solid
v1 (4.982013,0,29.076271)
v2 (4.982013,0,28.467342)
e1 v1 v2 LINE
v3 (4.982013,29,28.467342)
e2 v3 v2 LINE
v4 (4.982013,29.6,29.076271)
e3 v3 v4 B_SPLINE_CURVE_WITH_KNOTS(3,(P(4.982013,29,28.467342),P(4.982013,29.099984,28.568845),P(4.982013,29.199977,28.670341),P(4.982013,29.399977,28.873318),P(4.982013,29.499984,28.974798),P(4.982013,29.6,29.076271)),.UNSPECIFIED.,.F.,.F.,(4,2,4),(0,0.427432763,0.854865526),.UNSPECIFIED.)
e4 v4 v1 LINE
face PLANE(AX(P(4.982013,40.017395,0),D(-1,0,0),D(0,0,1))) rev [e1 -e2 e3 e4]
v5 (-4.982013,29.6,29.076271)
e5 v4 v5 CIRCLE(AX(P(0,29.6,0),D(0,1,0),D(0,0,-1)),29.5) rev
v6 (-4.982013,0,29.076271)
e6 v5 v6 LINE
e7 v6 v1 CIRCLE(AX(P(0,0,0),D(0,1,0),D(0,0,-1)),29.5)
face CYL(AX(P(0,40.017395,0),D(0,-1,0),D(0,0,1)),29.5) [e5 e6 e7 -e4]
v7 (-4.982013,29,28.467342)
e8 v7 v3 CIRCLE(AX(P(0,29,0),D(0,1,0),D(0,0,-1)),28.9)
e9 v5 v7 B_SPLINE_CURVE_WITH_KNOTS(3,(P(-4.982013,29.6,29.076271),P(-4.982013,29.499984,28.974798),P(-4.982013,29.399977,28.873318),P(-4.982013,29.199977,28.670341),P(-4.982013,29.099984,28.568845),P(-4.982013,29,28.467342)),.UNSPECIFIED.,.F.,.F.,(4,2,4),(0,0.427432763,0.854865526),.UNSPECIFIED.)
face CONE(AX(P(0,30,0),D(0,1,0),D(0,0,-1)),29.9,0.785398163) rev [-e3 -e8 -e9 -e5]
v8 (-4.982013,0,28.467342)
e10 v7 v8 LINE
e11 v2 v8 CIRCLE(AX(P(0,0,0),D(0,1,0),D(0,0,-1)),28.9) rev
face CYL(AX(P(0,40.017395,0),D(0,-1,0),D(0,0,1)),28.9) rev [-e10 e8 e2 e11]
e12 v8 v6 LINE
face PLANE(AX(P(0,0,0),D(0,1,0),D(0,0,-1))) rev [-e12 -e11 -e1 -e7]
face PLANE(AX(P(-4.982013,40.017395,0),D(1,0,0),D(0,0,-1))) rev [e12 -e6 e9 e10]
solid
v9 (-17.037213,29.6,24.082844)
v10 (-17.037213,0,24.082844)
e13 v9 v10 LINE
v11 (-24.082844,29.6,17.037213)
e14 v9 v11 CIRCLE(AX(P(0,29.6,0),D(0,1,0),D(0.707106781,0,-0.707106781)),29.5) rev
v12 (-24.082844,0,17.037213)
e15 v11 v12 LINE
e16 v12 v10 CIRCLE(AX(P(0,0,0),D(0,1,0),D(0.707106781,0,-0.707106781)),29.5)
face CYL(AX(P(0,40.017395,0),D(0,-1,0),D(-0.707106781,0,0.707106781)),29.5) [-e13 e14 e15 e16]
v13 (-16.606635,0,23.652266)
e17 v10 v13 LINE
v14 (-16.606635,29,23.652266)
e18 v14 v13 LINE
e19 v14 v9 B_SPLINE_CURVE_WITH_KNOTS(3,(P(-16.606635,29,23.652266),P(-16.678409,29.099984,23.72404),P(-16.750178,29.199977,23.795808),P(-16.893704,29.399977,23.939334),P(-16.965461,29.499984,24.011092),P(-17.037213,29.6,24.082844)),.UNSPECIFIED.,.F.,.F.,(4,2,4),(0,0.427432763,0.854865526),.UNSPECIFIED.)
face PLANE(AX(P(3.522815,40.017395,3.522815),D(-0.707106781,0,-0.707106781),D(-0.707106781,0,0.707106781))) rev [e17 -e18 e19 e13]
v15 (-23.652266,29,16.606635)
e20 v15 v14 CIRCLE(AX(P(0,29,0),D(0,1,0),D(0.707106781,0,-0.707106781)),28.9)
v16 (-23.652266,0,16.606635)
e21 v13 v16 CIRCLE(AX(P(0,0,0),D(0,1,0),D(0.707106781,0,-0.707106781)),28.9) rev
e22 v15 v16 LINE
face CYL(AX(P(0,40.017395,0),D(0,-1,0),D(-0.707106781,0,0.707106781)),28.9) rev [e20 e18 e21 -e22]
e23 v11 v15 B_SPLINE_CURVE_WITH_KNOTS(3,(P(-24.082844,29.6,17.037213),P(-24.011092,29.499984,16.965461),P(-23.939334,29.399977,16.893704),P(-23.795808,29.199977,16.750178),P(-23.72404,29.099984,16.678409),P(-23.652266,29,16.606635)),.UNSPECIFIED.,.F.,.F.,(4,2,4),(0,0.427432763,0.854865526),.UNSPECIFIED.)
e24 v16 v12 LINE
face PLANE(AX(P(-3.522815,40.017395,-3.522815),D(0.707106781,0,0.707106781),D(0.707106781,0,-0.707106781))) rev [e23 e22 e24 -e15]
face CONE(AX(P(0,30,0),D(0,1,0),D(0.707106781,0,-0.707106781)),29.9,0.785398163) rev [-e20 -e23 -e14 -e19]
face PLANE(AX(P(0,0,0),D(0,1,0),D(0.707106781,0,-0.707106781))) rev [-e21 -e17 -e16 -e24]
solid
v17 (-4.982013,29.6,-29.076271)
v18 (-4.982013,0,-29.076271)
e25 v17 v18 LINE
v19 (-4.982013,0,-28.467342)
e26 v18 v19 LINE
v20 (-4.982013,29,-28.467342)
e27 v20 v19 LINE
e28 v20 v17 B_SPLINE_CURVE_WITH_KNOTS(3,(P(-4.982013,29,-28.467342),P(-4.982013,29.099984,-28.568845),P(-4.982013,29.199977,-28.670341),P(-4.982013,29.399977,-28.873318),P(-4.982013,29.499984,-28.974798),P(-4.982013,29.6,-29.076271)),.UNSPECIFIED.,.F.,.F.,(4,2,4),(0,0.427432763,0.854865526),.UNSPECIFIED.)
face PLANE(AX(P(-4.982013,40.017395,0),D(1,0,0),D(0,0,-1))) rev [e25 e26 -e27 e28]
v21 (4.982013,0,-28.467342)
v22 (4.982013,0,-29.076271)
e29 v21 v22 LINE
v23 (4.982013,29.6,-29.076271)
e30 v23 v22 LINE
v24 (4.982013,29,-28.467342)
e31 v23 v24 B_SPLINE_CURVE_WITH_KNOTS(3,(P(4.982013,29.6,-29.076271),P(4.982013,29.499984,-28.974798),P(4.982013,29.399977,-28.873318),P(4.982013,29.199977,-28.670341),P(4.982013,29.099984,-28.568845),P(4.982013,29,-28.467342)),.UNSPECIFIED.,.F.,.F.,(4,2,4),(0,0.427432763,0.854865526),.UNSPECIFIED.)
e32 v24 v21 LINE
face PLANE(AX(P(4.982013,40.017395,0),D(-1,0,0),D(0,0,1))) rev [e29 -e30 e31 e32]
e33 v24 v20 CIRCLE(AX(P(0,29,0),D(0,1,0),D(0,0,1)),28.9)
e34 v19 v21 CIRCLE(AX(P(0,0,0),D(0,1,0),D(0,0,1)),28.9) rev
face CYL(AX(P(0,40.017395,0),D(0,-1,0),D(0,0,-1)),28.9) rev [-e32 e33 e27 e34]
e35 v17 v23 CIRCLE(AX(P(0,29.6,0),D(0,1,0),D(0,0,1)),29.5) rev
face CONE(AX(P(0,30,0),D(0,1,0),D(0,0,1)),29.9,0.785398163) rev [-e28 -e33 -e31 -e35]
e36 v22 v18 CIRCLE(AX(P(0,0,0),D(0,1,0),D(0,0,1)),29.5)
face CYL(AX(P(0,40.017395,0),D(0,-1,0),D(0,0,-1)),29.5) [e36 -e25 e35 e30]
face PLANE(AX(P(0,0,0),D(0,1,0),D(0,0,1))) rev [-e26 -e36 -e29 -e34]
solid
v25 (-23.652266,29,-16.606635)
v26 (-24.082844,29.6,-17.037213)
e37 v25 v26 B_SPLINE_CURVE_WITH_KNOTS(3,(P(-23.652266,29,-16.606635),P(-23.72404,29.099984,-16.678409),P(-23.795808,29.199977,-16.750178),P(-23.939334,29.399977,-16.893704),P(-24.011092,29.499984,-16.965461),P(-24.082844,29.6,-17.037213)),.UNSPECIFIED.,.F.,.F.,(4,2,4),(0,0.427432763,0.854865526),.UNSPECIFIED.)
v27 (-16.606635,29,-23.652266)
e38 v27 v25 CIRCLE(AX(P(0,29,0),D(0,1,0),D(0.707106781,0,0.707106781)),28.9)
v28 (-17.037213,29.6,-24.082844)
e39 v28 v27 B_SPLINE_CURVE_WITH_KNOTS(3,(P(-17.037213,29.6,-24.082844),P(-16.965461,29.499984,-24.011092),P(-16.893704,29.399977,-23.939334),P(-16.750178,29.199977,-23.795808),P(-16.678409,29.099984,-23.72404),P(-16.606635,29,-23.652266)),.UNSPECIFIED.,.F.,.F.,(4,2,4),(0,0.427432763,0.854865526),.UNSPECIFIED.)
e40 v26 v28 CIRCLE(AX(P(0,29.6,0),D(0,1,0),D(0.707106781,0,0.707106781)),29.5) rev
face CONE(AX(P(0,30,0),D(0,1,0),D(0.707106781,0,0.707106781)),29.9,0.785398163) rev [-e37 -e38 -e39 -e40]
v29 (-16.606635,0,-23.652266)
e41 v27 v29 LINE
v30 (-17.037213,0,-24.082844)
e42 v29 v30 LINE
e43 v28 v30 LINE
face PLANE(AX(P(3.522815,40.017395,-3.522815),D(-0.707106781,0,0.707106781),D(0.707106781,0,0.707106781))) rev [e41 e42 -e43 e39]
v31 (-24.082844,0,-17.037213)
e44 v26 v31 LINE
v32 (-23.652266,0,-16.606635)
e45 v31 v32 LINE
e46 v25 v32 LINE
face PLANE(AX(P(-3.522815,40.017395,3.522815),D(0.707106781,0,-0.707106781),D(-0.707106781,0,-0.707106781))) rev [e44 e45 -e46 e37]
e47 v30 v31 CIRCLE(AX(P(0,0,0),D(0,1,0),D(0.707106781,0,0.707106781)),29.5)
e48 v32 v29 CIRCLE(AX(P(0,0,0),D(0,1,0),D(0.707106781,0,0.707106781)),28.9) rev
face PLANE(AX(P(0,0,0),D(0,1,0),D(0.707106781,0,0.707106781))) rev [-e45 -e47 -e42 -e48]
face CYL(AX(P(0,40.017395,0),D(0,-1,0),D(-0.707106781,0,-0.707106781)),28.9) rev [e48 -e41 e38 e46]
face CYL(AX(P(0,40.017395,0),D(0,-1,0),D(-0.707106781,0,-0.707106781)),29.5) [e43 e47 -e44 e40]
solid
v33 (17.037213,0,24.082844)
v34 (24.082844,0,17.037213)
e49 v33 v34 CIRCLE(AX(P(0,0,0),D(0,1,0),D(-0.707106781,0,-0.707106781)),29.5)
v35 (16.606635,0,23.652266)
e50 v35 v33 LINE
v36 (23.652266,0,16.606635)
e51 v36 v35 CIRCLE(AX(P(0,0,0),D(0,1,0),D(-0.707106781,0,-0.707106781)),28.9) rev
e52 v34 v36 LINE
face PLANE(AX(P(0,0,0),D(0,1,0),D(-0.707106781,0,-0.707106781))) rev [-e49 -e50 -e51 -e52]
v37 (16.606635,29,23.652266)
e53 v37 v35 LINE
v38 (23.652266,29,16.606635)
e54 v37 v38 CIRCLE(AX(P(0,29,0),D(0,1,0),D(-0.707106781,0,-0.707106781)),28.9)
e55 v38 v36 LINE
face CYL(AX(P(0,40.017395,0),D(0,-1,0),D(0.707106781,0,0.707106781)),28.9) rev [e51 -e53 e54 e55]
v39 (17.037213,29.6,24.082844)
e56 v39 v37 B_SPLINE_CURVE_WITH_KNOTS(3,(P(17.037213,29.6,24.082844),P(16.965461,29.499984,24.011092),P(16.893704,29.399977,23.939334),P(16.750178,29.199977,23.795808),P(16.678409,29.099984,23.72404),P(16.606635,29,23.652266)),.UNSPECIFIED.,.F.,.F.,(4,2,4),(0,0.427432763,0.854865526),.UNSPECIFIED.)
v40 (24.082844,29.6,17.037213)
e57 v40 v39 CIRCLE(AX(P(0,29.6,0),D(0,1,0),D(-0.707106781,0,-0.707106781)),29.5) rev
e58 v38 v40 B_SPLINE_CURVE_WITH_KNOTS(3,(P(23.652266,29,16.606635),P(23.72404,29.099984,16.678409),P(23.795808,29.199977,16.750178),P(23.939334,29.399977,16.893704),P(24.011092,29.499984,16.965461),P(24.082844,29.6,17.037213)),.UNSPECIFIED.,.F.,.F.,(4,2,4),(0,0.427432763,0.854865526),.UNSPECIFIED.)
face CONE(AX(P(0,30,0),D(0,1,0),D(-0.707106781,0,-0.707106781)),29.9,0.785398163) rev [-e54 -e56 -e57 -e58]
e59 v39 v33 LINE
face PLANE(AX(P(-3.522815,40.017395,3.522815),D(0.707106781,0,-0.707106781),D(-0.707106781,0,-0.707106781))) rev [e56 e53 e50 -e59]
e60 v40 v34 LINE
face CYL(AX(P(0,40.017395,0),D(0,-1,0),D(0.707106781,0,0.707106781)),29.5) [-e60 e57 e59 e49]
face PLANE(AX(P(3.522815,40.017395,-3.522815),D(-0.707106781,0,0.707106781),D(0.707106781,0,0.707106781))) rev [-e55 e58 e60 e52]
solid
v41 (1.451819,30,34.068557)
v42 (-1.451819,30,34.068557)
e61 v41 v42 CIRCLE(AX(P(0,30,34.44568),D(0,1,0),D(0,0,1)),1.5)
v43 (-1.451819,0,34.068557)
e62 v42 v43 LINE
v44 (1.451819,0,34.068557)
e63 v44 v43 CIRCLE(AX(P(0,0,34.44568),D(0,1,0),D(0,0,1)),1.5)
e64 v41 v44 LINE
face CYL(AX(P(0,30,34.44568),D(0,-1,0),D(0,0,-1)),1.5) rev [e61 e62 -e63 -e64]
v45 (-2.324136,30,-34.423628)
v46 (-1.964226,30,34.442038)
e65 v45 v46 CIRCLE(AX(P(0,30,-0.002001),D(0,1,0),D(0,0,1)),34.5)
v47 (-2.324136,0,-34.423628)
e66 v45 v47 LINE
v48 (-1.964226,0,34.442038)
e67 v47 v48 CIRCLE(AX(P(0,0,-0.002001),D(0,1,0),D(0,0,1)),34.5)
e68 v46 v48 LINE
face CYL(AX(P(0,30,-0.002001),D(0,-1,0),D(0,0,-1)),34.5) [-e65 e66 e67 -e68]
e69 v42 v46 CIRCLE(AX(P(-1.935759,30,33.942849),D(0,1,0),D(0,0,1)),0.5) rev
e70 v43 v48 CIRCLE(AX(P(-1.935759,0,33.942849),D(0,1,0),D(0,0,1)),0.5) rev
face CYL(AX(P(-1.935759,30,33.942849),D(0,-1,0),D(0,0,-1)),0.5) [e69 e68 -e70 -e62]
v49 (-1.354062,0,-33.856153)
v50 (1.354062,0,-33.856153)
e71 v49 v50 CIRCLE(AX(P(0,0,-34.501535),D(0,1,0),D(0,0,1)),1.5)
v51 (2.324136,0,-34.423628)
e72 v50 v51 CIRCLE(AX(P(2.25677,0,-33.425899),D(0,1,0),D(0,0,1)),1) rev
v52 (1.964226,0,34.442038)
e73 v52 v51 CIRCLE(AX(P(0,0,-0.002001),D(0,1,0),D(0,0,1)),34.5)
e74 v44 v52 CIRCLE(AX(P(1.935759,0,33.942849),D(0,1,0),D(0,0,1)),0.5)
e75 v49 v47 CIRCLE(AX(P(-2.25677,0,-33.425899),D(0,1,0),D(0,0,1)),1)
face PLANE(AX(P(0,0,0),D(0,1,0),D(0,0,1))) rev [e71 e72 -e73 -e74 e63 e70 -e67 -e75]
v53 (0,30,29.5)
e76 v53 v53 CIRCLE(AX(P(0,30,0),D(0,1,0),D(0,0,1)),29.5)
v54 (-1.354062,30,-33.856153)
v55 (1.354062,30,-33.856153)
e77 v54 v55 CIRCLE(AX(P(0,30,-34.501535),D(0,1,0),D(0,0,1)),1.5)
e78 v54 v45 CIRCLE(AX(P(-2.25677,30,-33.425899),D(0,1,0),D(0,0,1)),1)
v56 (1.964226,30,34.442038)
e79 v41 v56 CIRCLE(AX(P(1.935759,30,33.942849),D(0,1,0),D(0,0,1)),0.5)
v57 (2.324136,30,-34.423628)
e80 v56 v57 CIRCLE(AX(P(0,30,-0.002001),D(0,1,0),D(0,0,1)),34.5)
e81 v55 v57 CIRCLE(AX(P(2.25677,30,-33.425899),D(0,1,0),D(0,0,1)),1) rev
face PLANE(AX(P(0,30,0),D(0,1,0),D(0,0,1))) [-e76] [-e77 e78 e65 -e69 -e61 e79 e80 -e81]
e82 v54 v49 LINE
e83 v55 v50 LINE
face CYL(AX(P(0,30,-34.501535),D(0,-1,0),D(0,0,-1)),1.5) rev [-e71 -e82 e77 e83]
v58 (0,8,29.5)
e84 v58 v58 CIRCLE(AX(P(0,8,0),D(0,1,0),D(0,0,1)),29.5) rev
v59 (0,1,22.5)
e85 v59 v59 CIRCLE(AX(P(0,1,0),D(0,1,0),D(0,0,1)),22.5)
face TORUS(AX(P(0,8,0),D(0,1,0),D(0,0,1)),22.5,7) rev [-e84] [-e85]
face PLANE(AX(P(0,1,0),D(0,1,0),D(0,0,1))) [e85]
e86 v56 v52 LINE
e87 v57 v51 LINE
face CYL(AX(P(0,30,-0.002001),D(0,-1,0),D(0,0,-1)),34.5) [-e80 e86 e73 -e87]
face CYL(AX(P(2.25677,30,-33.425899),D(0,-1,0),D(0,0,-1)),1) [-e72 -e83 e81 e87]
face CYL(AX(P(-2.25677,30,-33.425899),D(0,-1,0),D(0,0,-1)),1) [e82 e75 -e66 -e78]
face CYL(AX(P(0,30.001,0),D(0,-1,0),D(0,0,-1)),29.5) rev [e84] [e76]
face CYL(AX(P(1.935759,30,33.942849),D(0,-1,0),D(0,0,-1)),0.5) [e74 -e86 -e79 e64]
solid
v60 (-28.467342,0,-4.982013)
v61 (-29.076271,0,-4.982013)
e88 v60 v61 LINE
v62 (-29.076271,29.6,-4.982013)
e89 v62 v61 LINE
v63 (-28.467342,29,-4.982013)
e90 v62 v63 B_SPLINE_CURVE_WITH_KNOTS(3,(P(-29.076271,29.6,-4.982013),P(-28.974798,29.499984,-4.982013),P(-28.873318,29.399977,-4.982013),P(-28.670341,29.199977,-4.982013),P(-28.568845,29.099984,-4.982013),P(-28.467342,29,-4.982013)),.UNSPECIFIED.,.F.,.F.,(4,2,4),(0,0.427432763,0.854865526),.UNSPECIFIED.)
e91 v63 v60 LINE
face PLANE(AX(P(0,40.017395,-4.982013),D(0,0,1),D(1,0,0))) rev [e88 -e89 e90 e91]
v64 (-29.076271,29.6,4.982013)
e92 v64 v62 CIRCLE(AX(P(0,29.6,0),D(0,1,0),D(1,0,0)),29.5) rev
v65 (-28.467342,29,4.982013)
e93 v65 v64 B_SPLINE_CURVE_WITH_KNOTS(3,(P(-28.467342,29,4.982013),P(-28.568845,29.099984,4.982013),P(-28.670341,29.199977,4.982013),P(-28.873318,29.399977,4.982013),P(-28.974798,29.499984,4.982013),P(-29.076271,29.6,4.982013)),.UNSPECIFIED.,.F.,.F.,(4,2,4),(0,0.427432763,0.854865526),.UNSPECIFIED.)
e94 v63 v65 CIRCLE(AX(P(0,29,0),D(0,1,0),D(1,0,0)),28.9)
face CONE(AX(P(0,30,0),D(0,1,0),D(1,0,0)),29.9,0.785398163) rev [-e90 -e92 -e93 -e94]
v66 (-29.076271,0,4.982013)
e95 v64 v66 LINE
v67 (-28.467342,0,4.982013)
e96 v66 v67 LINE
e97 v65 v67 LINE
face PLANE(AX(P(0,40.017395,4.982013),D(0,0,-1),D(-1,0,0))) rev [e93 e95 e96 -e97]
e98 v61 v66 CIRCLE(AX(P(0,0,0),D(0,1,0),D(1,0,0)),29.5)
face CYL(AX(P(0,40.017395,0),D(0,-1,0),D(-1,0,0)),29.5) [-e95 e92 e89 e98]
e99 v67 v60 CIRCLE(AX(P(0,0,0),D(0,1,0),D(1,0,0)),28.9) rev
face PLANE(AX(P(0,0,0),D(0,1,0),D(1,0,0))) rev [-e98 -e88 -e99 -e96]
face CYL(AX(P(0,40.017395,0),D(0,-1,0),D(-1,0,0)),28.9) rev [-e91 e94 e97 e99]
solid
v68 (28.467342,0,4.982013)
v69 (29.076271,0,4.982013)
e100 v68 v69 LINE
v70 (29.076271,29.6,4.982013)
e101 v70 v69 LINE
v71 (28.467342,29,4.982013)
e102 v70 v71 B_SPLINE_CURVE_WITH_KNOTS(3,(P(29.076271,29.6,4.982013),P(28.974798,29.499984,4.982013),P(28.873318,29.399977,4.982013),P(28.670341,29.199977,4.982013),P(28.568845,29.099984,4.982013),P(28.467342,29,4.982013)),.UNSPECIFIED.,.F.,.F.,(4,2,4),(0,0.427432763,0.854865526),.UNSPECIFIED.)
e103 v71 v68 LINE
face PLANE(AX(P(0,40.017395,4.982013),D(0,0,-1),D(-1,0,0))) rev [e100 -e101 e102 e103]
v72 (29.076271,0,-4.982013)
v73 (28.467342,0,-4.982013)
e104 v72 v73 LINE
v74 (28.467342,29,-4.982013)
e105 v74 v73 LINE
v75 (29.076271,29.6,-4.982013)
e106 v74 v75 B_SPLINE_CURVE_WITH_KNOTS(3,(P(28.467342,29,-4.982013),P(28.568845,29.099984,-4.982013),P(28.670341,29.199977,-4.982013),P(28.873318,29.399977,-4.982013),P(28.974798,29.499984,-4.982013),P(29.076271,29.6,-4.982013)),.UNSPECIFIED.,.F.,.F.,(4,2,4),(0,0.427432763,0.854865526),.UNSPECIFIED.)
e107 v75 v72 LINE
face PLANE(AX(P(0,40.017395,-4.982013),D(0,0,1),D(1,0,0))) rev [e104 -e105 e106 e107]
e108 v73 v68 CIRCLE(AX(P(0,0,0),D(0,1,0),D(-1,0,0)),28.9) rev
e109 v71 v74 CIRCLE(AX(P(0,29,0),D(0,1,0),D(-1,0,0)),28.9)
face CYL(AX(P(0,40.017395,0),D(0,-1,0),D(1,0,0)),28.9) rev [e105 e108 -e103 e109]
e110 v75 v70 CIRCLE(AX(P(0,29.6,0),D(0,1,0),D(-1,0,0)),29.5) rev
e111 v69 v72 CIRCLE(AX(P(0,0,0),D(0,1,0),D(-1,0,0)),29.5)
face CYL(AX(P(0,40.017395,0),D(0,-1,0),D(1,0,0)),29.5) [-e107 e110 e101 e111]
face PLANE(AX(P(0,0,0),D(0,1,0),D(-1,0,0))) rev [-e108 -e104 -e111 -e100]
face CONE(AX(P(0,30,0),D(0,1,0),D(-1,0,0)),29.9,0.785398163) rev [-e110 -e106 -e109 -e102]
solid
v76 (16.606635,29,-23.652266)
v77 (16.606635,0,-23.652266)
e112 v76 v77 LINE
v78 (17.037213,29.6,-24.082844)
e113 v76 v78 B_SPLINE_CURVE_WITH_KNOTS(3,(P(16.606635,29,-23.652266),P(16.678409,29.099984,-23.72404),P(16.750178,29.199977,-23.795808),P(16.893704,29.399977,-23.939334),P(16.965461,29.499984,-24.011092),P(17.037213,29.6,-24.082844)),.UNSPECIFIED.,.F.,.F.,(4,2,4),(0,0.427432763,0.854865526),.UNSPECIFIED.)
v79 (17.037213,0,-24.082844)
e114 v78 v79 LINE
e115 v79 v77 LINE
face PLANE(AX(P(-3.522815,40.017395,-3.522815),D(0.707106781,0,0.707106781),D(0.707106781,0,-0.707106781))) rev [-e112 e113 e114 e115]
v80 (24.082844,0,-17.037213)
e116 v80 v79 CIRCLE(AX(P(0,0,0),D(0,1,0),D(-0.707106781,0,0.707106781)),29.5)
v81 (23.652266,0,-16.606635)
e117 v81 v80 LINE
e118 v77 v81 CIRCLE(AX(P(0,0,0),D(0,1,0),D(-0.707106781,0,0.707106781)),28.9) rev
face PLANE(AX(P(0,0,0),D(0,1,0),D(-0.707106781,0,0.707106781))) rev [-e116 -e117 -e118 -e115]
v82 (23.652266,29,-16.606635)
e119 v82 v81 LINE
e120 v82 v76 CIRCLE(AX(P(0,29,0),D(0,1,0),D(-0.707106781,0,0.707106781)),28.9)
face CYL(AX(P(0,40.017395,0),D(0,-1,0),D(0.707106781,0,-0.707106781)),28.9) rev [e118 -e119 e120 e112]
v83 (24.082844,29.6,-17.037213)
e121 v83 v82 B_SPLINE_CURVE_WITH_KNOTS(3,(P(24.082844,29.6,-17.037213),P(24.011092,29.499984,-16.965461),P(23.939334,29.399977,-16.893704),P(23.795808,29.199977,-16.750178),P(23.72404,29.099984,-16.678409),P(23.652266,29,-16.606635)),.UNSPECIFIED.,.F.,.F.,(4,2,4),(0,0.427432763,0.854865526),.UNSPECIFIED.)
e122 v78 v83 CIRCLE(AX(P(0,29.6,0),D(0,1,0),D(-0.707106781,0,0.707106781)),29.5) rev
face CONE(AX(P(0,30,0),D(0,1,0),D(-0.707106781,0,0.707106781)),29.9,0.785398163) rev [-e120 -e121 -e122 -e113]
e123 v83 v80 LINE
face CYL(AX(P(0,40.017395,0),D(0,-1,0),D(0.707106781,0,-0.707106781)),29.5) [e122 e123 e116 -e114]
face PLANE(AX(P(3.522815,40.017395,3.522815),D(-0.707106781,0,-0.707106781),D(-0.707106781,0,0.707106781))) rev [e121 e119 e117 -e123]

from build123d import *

# Parameters (mm, degrees)
BOSS_EXTRUDE1_DEPTH = 30
CUT_EXTRUDE2_REACH  = 60.241
CUT_EXTRUDE2_START  = 1
SKETCH2_R           = 29.5
BOSS_EXTRUDE2_DEPTH = 30
CHAMFER2_SIZE       = 1
CIRPATTERN2_COUNT   = 8
FILLET2_R           = 7


with BuildPart() as part:
    # Sketch1 → Boss-Extrude1 (new body)
    with BuildSketch(Plane(origin=(0, 0, 0), x_dir=(1, 0, 0), z_dir=(0, 1, 0))):
        with BuildLine():
            ThreePointArc((1.451818925, -34.068556857), (1.641248992, -34.346908706), (1.964225605, -34.442038138))
            ThreePointArc((1.964225605, -34.442038138), (34.499528846, -0.178302888), (2.324135821, 34.423627607))
            ThreePointArc((2.324135821, 34.423627607), (1.751838249, 34.289058819), (1.354061739, 33.856153382))
            ThreePointArc((1.354061739, 33.856153382), (0, 33.001534515), (-1.354061739, 33.856153382))
            ThreePointArc((-1.354061739, 33.856153382), (-1.751838249, 34.289058819), (-2.324135821, 34.423627607))
            ThreePointArc((-2.324135821, 34.423627607), (-34.499528846, -0.178302888), (-1.964225605, -34.442038138))
            ThreePointArc((-1.964225605, -34.442038138), (-1.641248992, -34.346908706), (-1.451818925, -34.068556857))
            ThreePointArc((-1.451818925, -34.068556857), (0, -32.945679925), (1.451818925, -34.068556857))
        make_face()
    extrude(amount=BOSS_EXTRUDE1_DEPTH)

    # Sketch2 → Cut-Extrude2 (cut, up to next)
    with BuildSketch(Plane(origin=(0, 0, 0), x_dir=(1, 0, 0), z_dir=(0, 1, 0)).offset(CUT_EXTRUDE2_START), mode=Mode.PRIVATE) as cut_extrude2_sk1:
        with Locations(Location((0, 0, 0), (0, 0, 270))):
            Circle(SKETCH2_R)
    cut_extrude2_tool1 = extrude(cut_extrude2_sk1.sketch, amount=CUT_EXTRUDE2_REACH, mode=Mode.PRIVATE) & part.part
    add(cut_extrude2_tool1.solids().sort_by_distance((0, 1, 0))[0], mode=Mode.SUBTRACT)

    # Fillet2
    fillet2_edges = [part.edges().sort_by_distance(p)[0] for p in [
        (0, 1, -29.5),
    ]]
    fillet(fillet2_edges, radius=FILLET2_R)


with BuildPart() as body_2:
    # Sketch2<2> → Boss-Extrude2 (new body)
    with BuildSketch(Plane(origin=(0, 0, 0), x_dir=(1, 0, 0), z_dir=(0, 1, 0))):
        with BuildLine():
            ThreePointArc((4.982013036, 29.076271186), (0, 29.5), (-4.982013036, 29.076271186))
            Line((-4.982013036, 29.076271186), (-4.982013036, 28.467341746))
            ThreePointArc((-4.982013036, 28.467341746), (0, 28.9), (4.982013036, 28.467341746))
            Line((4.982013036, 28.467341746), (4.982013036, 29.076271186))
        make_face()
    extrude(amount=BOSS_EXTRUDE2_DEPTH)

    # Chamfer2
    # the kernel refuses this chamfer: 1 mm, written as the material it takes off along each edge
    with BuildSketch(Plane(origin=(0, 30, 0), x_dir=(-0.25924534785409165, 0, -0.9658114979725655), z_dir=(-0.9658114979725655, 0, 0.25924534785409165))) as chamfer2_piece_1:
        Polygon((28.9, CHAMFER2_SIZE), (28.9 + CHAMFER2_SIZE, 0), (28.9, 0), align=None)
    revolve(axis=Axis((0, 30, 0), (0, -1, 0)), revolution_arc=30.050576955, mode=Mode.SUBTRACT)


with BuildPart() as cirpattern2_1:
    # CirPattern2: pattern copy
    add(body_2.part.rotate(Axis((0, 0, 0), (0, 1, 0)), 1 * 360 / CIRPATTERN2_COUNT))


with BuildPart() as cirpattern2_2:
    # CirPattern2: pattern copy
    add(body_2.part.rotate(Axis((0, 0, 0), (0, 1, 0)), 2 * 360 / CIRPATTERN2_COUNT))


with BuildPart() as cirpattern2_3:
    # CirPattern2: pattern copy
    add(body_2.part.rotate(Axis((0, 0, 0), (0, 1, 0)), 3 * 360 / CIRPATTERN2_COUNT))


with BuildPart() as cirpattern2_4:
    # CirPattern2: pattern copy
    add(body_2.part.rotate(Axis((0, 0, 0), (0, 1, 0)), 4 * 360 / CIRPATTERN2_COUNT))


with BuildPart() as cirpattern2_5:
    # CirPattern2: pattern copy
    add(body_2.part.rotate(Axis((0, 0, 0), (0, 1, 0)), 5 * 360 / CIRPATTERN2_COUNT))


with BuildPart() as cirpattern2_6:
    # CirPattern2: pattern copy
    add(body_2.part.rotate(Axis((0, 0, 0), (0, 1, 0)), 6 * 360 / CIRPATTERN2_COUNT))


with BuildPart() as cirpattern2_7:
    # CirPattern2: pattern copy
    add(body_2.part.rotate(Axis((0, 0, 0), (0, 1, 0)), 7 * 360 / CIRPATTERN2_COUNT))


solid = Compound([part.part, body_2.part, cirpattern2_1.part, cirpattern2_2.part, cirpattern2_3.part, cirpattern2_4.part, cirpattern2_5.part, cirpattern2_6.part, cirpattern2_7.part])
